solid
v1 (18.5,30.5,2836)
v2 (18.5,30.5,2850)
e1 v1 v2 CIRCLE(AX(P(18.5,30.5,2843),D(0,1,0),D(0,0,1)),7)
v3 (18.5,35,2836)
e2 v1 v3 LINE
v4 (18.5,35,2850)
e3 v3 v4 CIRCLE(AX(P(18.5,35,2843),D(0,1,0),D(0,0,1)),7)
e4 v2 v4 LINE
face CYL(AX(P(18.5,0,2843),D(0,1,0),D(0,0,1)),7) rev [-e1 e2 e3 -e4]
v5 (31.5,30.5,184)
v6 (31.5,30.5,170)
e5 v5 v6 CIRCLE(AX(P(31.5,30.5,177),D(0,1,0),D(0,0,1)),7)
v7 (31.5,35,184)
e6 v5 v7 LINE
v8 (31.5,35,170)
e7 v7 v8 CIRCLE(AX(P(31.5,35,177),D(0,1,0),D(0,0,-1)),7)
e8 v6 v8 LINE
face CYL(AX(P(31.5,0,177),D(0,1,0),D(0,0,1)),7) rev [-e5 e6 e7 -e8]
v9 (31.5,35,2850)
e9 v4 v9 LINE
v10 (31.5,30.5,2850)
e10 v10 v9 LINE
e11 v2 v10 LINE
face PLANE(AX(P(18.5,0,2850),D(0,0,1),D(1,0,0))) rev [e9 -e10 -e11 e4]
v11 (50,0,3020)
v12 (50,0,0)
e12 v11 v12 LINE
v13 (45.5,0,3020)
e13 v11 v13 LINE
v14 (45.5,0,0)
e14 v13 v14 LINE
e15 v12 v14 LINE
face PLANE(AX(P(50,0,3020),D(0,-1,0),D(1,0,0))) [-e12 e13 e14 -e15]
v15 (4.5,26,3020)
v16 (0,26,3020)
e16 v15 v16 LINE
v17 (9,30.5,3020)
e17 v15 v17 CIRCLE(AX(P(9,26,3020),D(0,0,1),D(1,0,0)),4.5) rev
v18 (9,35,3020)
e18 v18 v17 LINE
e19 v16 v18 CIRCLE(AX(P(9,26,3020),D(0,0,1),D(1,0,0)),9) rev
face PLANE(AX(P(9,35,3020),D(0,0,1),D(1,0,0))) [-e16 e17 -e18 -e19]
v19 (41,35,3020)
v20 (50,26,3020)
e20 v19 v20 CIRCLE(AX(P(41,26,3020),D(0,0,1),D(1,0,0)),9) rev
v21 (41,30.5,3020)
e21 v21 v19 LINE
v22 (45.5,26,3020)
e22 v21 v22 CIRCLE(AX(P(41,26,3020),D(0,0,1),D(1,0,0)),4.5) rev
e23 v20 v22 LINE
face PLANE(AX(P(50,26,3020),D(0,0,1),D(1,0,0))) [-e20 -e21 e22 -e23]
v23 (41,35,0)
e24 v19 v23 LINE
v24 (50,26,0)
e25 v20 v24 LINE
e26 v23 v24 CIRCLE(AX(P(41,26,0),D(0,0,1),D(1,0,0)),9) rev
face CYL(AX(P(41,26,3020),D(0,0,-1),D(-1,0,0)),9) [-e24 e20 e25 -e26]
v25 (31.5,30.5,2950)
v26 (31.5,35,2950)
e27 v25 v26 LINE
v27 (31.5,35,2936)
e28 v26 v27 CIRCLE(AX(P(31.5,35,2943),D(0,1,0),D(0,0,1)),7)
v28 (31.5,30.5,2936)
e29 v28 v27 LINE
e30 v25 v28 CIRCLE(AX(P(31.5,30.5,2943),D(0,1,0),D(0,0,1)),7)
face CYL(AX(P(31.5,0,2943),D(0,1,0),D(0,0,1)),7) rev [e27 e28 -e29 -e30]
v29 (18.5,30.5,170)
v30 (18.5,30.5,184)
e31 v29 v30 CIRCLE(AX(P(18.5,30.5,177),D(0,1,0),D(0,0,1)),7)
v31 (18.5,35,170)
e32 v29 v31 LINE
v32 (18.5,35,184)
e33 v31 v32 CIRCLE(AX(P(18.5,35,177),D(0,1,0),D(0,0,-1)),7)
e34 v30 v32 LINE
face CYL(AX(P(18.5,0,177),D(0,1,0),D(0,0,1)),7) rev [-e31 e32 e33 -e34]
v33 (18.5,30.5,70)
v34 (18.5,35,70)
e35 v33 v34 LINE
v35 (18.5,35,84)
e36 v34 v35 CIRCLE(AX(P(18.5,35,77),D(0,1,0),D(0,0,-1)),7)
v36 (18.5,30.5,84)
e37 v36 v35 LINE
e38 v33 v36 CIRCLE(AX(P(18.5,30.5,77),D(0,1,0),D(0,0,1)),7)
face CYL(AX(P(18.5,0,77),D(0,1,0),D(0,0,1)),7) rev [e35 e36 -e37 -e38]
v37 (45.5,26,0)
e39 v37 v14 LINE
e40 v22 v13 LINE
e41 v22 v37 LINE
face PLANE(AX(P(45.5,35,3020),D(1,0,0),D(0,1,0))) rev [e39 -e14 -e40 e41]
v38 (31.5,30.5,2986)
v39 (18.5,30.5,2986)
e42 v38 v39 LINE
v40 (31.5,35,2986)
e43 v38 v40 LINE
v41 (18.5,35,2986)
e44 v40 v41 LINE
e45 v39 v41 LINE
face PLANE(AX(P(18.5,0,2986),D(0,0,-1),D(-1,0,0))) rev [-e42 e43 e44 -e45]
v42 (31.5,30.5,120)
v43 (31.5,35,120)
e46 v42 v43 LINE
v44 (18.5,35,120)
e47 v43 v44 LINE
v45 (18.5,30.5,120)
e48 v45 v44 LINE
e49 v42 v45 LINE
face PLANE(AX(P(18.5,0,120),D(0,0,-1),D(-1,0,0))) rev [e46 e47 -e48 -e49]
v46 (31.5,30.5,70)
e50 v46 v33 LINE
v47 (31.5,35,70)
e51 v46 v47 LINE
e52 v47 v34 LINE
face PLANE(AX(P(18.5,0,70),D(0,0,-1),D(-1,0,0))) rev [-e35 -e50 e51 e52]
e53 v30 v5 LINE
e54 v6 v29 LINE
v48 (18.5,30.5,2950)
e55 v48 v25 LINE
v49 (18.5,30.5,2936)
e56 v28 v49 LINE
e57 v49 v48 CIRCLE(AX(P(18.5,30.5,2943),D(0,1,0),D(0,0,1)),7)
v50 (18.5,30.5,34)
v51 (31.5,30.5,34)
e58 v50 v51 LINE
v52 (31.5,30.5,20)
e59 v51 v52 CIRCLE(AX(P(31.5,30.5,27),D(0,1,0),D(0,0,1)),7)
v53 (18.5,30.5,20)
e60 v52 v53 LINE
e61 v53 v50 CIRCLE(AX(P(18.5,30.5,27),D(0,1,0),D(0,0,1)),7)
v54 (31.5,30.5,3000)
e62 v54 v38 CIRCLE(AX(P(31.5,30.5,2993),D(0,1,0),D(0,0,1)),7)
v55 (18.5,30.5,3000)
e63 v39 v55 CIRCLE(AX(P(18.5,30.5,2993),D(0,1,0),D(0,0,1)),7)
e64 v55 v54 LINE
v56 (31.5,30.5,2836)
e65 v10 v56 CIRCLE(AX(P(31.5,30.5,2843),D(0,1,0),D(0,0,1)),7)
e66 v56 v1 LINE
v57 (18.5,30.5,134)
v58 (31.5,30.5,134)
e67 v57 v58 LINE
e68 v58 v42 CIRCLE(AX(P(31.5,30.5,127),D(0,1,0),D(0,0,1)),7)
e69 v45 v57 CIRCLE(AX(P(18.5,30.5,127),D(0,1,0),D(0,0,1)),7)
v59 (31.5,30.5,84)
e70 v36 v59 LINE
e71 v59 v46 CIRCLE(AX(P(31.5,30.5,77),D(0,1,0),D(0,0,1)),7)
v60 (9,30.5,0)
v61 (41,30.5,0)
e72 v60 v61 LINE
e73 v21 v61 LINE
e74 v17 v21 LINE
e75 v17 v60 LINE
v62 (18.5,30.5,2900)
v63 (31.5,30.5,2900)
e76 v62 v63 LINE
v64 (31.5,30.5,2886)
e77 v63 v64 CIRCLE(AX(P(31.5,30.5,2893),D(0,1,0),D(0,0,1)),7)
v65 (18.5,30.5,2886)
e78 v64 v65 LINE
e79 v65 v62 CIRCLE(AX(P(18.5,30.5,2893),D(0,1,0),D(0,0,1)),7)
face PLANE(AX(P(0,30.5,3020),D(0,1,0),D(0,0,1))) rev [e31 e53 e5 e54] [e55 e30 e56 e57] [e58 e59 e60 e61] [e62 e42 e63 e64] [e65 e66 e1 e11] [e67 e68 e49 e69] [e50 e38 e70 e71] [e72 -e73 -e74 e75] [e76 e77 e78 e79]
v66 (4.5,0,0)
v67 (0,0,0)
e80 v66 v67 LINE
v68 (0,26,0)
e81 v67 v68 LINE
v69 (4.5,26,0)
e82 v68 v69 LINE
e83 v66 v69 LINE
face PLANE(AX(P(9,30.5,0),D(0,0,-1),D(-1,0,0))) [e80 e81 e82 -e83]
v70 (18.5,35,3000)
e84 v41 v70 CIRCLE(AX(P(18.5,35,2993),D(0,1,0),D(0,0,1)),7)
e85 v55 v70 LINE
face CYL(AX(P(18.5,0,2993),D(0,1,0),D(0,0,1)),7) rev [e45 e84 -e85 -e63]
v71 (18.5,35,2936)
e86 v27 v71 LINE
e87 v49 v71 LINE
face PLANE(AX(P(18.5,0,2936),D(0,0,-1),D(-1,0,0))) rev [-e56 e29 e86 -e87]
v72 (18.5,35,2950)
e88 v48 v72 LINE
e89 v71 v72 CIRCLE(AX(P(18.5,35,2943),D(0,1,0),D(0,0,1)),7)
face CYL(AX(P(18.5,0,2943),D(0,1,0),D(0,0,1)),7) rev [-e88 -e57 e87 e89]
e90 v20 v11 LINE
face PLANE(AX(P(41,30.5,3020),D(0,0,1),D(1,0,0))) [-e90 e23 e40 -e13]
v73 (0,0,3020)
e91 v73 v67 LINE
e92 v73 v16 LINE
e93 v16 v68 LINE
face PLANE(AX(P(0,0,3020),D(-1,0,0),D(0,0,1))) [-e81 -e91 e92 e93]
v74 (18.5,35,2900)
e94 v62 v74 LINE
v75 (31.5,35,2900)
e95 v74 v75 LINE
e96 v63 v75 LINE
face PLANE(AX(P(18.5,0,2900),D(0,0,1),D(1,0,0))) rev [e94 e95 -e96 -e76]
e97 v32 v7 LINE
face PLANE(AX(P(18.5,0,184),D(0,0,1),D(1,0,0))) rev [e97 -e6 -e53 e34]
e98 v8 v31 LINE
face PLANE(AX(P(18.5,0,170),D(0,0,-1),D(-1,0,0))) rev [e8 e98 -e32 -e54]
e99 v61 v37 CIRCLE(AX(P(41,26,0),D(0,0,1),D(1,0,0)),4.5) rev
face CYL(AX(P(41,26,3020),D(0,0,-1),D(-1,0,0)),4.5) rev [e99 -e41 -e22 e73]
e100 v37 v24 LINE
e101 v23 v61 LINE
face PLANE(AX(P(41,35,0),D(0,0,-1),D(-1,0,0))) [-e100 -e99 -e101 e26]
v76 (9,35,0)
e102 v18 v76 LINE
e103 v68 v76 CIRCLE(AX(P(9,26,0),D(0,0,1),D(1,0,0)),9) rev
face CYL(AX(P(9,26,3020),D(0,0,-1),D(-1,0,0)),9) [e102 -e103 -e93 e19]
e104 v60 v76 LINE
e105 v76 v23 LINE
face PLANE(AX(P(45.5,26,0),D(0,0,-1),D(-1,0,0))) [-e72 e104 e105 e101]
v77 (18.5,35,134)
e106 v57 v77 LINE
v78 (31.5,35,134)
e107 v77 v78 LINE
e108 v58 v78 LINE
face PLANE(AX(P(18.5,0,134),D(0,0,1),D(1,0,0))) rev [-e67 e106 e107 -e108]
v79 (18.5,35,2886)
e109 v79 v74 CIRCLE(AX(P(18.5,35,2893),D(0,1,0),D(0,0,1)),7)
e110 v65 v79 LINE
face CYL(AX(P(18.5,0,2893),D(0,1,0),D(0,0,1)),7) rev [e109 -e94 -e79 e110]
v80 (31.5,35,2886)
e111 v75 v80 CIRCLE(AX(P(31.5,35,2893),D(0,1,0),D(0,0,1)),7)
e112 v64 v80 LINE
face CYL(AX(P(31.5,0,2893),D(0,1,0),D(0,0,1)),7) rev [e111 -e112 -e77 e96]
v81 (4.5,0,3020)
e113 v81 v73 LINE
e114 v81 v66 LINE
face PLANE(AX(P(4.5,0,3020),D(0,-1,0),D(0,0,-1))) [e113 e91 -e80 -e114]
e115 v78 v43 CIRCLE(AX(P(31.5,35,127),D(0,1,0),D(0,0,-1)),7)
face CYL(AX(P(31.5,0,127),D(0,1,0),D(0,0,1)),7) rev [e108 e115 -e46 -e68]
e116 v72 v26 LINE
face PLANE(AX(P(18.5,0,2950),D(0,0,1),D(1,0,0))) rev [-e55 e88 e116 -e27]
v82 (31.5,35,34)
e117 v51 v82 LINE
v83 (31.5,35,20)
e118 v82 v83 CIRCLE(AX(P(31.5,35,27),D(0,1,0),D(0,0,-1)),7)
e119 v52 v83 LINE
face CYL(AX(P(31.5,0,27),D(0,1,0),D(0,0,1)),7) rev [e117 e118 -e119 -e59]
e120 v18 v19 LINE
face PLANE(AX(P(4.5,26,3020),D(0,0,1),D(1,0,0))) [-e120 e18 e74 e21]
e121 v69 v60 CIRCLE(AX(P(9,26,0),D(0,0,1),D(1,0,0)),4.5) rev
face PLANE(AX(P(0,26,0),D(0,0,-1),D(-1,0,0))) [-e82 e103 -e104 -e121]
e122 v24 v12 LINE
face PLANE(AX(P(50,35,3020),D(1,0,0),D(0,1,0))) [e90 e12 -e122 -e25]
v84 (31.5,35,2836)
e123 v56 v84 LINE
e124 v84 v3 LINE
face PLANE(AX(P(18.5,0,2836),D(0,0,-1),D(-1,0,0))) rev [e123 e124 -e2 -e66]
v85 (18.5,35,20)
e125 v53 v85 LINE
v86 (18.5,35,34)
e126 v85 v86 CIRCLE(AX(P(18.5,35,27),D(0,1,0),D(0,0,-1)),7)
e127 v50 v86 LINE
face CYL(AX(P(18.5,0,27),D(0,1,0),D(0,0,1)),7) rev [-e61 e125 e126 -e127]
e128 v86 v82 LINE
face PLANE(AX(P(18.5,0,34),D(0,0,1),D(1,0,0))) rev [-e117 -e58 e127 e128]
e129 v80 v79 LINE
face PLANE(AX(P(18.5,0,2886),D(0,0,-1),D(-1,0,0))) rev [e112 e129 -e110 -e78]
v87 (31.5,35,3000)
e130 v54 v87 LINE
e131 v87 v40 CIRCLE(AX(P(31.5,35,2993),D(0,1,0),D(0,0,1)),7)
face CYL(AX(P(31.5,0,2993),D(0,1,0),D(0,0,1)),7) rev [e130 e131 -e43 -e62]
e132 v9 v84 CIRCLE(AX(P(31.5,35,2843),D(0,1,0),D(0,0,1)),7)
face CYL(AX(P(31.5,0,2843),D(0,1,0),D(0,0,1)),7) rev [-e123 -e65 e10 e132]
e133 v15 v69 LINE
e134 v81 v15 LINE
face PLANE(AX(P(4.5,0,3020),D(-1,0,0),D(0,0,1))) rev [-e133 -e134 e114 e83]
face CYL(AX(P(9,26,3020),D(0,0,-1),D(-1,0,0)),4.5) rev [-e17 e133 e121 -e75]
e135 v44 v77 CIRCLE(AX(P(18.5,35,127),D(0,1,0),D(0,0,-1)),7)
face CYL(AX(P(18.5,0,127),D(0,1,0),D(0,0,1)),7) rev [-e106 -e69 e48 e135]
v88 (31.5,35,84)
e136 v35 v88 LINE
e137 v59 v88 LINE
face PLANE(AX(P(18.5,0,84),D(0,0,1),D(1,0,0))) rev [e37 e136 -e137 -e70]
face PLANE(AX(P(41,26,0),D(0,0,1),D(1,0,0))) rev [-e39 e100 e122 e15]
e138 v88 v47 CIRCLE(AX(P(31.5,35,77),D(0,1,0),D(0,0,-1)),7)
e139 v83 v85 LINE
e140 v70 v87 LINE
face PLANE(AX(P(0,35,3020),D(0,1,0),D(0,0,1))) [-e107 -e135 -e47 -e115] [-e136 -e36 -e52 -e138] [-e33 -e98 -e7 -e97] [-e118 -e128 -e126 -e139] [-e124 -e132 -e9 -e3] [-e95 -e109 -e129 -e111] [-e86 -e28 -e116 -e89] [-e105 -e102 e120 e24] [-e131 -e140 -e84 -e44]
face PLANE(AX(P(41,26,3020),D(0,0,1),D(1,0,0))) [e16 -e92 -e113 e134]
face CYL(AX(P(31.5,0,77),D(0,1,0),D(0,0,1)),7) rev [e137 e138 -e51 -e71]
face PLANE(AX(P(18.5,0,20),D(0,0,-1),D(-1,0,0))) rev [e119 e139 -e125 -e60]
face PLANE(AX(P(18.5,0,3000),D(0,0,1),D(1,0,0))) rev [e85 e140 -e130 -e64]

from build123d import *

# Parameters (mm, degrees)
BASE_FLANGE1_DEPTH = 3020
CUT_EXTRUDE1_DEPTH = 3021.616658896


# Sheet-metal steps are written as plain solids
with BuildPart() as part:
    # Sketch1 → Base-Flange1 (new body)
    with BuildSketch(Plane.XY):
        with BuildLine():
            Line((0, 0), (0, 26))
            ThreePointArc((0, 26), (2.636038969, 32.363961031), (9, 35))
            Line((9, 35), (41, 35))
            ThreePointArc((41, 35), (47.363961031, 32.363961031), (50, 26))
            Line((50, 26), (50, 0))
            Line((50, 0), (45.5, 0))
            Line((45.5, 0), (45.5, 26))
            ThreePointArc((45.5, 26), (44.181980515, 29.181980515), (41, 30.5))
            Line((41, 30.5), (9, 30.5))
            ThreePointArc((9, 30.5), (5.818019485, 29.181980515), (4.5, 26))
            Line((4.5, 26), (4.5, 0))
            Line((4.5, 0), (0, 0))
        make_face()
    extrude(amount=BASE_FLANGE1_DEPTH)

    # Sketch6 → Cut-Extrude1 (cut, through all)
    with BuildSketch(Plane(origin=(0, 35, 0), x_dir=(1, 0, 0), z_dir=(0, 1, 0))):
        with BuildLine():
            Line((18.5, -2986), (31.5, -2986))
            ThreePointArc((31.5, -2986), (38.5, -2993), (31.5, -3000))
            Line((31.5, -3000), (18.5, -3000))
            ThreePointArc((18.5, -3000), (11.5, -2993), (18.5, -2986))
        make_face()
        with BuildLine():
            Line((18.5, -2936), (31.5, -2936))
            ThreePointArc((31.5, -2936), (38.5, -2943), (31.5, -2950))
            Line((31.5, -2950), (18.5, -2950))
            ThreePointArc((18.5, -2950), (11.5, -2943), (18.5, -2936))
        make_face()
        with BuildLine():
            Line((18.5, -2886), (31.5, -2886))
            ThreePointArc((31.5, -2886), (38.5, -2893), (31.5, -2900))
            Line((31.5, -2900), (18.5, -2900))
            ThreePointArc((18.5, -2900), (11.5, -2893), (18.5, -2886))
        make_face()
        with BuildLine():
            Line((18.5, -2836), (31.5, -2836))
            ThreePointArc((31.5, -2836), (38.5, -2843), (31.5, -2850))
            Line((31.5, -2850), (18.5, -2850))
            ThreePointArc((18.5, -2850), (11.5, -2843), (18.5, -2836))
        make_face()
        with BuildLine():
            Line((18.5, -34), (31.5, -34))
            ThreePointArc((31.5, -34), (38.5, -27), (31.5, -20))
            Line((31.5, -20), (18.5, -20))
            ThreePointArc((18.5, -20), (11.5, -27), (18.5, -34))
        make_face()
        with BuildLine():
            Line((18.5, -84), (31.5, -84))
            ThreePointArc((31.5, -84), (38.5, -77), (31.5, -70))
            Line((31.5, -70), (18.5, -70))
            ThreePointArc((18.5, -70), (11.5, -77), (18.5, -84))
        make_face()
        with BuildLine():
            Line((18.5, -134), (31.5, -134))
            ThreePointArc((31.5, -134), (38.5, -127), (31.5, -120))
            Line((31.5, -120), (18.5, -120))
            ThreePointArc((18.5, -120), (11.5, -127), (18.5, -134))
        make_face()
        with BuildLine():
            Line((18.5, -184), (31.5, -184))
            ThreePointArc((31.5, -184), (38.5, -177), (31.5, -170))
            Line((31.5, -170), (18.5, -170))
            ThreePointArc((18.5, -170), (11.5, -177), (18.5, -184))
        make_face()
    extrude(amount=-CUT_EXTRUDE1_DEPTH, mode=Mode.SUBTRACT)


solid = part.part
